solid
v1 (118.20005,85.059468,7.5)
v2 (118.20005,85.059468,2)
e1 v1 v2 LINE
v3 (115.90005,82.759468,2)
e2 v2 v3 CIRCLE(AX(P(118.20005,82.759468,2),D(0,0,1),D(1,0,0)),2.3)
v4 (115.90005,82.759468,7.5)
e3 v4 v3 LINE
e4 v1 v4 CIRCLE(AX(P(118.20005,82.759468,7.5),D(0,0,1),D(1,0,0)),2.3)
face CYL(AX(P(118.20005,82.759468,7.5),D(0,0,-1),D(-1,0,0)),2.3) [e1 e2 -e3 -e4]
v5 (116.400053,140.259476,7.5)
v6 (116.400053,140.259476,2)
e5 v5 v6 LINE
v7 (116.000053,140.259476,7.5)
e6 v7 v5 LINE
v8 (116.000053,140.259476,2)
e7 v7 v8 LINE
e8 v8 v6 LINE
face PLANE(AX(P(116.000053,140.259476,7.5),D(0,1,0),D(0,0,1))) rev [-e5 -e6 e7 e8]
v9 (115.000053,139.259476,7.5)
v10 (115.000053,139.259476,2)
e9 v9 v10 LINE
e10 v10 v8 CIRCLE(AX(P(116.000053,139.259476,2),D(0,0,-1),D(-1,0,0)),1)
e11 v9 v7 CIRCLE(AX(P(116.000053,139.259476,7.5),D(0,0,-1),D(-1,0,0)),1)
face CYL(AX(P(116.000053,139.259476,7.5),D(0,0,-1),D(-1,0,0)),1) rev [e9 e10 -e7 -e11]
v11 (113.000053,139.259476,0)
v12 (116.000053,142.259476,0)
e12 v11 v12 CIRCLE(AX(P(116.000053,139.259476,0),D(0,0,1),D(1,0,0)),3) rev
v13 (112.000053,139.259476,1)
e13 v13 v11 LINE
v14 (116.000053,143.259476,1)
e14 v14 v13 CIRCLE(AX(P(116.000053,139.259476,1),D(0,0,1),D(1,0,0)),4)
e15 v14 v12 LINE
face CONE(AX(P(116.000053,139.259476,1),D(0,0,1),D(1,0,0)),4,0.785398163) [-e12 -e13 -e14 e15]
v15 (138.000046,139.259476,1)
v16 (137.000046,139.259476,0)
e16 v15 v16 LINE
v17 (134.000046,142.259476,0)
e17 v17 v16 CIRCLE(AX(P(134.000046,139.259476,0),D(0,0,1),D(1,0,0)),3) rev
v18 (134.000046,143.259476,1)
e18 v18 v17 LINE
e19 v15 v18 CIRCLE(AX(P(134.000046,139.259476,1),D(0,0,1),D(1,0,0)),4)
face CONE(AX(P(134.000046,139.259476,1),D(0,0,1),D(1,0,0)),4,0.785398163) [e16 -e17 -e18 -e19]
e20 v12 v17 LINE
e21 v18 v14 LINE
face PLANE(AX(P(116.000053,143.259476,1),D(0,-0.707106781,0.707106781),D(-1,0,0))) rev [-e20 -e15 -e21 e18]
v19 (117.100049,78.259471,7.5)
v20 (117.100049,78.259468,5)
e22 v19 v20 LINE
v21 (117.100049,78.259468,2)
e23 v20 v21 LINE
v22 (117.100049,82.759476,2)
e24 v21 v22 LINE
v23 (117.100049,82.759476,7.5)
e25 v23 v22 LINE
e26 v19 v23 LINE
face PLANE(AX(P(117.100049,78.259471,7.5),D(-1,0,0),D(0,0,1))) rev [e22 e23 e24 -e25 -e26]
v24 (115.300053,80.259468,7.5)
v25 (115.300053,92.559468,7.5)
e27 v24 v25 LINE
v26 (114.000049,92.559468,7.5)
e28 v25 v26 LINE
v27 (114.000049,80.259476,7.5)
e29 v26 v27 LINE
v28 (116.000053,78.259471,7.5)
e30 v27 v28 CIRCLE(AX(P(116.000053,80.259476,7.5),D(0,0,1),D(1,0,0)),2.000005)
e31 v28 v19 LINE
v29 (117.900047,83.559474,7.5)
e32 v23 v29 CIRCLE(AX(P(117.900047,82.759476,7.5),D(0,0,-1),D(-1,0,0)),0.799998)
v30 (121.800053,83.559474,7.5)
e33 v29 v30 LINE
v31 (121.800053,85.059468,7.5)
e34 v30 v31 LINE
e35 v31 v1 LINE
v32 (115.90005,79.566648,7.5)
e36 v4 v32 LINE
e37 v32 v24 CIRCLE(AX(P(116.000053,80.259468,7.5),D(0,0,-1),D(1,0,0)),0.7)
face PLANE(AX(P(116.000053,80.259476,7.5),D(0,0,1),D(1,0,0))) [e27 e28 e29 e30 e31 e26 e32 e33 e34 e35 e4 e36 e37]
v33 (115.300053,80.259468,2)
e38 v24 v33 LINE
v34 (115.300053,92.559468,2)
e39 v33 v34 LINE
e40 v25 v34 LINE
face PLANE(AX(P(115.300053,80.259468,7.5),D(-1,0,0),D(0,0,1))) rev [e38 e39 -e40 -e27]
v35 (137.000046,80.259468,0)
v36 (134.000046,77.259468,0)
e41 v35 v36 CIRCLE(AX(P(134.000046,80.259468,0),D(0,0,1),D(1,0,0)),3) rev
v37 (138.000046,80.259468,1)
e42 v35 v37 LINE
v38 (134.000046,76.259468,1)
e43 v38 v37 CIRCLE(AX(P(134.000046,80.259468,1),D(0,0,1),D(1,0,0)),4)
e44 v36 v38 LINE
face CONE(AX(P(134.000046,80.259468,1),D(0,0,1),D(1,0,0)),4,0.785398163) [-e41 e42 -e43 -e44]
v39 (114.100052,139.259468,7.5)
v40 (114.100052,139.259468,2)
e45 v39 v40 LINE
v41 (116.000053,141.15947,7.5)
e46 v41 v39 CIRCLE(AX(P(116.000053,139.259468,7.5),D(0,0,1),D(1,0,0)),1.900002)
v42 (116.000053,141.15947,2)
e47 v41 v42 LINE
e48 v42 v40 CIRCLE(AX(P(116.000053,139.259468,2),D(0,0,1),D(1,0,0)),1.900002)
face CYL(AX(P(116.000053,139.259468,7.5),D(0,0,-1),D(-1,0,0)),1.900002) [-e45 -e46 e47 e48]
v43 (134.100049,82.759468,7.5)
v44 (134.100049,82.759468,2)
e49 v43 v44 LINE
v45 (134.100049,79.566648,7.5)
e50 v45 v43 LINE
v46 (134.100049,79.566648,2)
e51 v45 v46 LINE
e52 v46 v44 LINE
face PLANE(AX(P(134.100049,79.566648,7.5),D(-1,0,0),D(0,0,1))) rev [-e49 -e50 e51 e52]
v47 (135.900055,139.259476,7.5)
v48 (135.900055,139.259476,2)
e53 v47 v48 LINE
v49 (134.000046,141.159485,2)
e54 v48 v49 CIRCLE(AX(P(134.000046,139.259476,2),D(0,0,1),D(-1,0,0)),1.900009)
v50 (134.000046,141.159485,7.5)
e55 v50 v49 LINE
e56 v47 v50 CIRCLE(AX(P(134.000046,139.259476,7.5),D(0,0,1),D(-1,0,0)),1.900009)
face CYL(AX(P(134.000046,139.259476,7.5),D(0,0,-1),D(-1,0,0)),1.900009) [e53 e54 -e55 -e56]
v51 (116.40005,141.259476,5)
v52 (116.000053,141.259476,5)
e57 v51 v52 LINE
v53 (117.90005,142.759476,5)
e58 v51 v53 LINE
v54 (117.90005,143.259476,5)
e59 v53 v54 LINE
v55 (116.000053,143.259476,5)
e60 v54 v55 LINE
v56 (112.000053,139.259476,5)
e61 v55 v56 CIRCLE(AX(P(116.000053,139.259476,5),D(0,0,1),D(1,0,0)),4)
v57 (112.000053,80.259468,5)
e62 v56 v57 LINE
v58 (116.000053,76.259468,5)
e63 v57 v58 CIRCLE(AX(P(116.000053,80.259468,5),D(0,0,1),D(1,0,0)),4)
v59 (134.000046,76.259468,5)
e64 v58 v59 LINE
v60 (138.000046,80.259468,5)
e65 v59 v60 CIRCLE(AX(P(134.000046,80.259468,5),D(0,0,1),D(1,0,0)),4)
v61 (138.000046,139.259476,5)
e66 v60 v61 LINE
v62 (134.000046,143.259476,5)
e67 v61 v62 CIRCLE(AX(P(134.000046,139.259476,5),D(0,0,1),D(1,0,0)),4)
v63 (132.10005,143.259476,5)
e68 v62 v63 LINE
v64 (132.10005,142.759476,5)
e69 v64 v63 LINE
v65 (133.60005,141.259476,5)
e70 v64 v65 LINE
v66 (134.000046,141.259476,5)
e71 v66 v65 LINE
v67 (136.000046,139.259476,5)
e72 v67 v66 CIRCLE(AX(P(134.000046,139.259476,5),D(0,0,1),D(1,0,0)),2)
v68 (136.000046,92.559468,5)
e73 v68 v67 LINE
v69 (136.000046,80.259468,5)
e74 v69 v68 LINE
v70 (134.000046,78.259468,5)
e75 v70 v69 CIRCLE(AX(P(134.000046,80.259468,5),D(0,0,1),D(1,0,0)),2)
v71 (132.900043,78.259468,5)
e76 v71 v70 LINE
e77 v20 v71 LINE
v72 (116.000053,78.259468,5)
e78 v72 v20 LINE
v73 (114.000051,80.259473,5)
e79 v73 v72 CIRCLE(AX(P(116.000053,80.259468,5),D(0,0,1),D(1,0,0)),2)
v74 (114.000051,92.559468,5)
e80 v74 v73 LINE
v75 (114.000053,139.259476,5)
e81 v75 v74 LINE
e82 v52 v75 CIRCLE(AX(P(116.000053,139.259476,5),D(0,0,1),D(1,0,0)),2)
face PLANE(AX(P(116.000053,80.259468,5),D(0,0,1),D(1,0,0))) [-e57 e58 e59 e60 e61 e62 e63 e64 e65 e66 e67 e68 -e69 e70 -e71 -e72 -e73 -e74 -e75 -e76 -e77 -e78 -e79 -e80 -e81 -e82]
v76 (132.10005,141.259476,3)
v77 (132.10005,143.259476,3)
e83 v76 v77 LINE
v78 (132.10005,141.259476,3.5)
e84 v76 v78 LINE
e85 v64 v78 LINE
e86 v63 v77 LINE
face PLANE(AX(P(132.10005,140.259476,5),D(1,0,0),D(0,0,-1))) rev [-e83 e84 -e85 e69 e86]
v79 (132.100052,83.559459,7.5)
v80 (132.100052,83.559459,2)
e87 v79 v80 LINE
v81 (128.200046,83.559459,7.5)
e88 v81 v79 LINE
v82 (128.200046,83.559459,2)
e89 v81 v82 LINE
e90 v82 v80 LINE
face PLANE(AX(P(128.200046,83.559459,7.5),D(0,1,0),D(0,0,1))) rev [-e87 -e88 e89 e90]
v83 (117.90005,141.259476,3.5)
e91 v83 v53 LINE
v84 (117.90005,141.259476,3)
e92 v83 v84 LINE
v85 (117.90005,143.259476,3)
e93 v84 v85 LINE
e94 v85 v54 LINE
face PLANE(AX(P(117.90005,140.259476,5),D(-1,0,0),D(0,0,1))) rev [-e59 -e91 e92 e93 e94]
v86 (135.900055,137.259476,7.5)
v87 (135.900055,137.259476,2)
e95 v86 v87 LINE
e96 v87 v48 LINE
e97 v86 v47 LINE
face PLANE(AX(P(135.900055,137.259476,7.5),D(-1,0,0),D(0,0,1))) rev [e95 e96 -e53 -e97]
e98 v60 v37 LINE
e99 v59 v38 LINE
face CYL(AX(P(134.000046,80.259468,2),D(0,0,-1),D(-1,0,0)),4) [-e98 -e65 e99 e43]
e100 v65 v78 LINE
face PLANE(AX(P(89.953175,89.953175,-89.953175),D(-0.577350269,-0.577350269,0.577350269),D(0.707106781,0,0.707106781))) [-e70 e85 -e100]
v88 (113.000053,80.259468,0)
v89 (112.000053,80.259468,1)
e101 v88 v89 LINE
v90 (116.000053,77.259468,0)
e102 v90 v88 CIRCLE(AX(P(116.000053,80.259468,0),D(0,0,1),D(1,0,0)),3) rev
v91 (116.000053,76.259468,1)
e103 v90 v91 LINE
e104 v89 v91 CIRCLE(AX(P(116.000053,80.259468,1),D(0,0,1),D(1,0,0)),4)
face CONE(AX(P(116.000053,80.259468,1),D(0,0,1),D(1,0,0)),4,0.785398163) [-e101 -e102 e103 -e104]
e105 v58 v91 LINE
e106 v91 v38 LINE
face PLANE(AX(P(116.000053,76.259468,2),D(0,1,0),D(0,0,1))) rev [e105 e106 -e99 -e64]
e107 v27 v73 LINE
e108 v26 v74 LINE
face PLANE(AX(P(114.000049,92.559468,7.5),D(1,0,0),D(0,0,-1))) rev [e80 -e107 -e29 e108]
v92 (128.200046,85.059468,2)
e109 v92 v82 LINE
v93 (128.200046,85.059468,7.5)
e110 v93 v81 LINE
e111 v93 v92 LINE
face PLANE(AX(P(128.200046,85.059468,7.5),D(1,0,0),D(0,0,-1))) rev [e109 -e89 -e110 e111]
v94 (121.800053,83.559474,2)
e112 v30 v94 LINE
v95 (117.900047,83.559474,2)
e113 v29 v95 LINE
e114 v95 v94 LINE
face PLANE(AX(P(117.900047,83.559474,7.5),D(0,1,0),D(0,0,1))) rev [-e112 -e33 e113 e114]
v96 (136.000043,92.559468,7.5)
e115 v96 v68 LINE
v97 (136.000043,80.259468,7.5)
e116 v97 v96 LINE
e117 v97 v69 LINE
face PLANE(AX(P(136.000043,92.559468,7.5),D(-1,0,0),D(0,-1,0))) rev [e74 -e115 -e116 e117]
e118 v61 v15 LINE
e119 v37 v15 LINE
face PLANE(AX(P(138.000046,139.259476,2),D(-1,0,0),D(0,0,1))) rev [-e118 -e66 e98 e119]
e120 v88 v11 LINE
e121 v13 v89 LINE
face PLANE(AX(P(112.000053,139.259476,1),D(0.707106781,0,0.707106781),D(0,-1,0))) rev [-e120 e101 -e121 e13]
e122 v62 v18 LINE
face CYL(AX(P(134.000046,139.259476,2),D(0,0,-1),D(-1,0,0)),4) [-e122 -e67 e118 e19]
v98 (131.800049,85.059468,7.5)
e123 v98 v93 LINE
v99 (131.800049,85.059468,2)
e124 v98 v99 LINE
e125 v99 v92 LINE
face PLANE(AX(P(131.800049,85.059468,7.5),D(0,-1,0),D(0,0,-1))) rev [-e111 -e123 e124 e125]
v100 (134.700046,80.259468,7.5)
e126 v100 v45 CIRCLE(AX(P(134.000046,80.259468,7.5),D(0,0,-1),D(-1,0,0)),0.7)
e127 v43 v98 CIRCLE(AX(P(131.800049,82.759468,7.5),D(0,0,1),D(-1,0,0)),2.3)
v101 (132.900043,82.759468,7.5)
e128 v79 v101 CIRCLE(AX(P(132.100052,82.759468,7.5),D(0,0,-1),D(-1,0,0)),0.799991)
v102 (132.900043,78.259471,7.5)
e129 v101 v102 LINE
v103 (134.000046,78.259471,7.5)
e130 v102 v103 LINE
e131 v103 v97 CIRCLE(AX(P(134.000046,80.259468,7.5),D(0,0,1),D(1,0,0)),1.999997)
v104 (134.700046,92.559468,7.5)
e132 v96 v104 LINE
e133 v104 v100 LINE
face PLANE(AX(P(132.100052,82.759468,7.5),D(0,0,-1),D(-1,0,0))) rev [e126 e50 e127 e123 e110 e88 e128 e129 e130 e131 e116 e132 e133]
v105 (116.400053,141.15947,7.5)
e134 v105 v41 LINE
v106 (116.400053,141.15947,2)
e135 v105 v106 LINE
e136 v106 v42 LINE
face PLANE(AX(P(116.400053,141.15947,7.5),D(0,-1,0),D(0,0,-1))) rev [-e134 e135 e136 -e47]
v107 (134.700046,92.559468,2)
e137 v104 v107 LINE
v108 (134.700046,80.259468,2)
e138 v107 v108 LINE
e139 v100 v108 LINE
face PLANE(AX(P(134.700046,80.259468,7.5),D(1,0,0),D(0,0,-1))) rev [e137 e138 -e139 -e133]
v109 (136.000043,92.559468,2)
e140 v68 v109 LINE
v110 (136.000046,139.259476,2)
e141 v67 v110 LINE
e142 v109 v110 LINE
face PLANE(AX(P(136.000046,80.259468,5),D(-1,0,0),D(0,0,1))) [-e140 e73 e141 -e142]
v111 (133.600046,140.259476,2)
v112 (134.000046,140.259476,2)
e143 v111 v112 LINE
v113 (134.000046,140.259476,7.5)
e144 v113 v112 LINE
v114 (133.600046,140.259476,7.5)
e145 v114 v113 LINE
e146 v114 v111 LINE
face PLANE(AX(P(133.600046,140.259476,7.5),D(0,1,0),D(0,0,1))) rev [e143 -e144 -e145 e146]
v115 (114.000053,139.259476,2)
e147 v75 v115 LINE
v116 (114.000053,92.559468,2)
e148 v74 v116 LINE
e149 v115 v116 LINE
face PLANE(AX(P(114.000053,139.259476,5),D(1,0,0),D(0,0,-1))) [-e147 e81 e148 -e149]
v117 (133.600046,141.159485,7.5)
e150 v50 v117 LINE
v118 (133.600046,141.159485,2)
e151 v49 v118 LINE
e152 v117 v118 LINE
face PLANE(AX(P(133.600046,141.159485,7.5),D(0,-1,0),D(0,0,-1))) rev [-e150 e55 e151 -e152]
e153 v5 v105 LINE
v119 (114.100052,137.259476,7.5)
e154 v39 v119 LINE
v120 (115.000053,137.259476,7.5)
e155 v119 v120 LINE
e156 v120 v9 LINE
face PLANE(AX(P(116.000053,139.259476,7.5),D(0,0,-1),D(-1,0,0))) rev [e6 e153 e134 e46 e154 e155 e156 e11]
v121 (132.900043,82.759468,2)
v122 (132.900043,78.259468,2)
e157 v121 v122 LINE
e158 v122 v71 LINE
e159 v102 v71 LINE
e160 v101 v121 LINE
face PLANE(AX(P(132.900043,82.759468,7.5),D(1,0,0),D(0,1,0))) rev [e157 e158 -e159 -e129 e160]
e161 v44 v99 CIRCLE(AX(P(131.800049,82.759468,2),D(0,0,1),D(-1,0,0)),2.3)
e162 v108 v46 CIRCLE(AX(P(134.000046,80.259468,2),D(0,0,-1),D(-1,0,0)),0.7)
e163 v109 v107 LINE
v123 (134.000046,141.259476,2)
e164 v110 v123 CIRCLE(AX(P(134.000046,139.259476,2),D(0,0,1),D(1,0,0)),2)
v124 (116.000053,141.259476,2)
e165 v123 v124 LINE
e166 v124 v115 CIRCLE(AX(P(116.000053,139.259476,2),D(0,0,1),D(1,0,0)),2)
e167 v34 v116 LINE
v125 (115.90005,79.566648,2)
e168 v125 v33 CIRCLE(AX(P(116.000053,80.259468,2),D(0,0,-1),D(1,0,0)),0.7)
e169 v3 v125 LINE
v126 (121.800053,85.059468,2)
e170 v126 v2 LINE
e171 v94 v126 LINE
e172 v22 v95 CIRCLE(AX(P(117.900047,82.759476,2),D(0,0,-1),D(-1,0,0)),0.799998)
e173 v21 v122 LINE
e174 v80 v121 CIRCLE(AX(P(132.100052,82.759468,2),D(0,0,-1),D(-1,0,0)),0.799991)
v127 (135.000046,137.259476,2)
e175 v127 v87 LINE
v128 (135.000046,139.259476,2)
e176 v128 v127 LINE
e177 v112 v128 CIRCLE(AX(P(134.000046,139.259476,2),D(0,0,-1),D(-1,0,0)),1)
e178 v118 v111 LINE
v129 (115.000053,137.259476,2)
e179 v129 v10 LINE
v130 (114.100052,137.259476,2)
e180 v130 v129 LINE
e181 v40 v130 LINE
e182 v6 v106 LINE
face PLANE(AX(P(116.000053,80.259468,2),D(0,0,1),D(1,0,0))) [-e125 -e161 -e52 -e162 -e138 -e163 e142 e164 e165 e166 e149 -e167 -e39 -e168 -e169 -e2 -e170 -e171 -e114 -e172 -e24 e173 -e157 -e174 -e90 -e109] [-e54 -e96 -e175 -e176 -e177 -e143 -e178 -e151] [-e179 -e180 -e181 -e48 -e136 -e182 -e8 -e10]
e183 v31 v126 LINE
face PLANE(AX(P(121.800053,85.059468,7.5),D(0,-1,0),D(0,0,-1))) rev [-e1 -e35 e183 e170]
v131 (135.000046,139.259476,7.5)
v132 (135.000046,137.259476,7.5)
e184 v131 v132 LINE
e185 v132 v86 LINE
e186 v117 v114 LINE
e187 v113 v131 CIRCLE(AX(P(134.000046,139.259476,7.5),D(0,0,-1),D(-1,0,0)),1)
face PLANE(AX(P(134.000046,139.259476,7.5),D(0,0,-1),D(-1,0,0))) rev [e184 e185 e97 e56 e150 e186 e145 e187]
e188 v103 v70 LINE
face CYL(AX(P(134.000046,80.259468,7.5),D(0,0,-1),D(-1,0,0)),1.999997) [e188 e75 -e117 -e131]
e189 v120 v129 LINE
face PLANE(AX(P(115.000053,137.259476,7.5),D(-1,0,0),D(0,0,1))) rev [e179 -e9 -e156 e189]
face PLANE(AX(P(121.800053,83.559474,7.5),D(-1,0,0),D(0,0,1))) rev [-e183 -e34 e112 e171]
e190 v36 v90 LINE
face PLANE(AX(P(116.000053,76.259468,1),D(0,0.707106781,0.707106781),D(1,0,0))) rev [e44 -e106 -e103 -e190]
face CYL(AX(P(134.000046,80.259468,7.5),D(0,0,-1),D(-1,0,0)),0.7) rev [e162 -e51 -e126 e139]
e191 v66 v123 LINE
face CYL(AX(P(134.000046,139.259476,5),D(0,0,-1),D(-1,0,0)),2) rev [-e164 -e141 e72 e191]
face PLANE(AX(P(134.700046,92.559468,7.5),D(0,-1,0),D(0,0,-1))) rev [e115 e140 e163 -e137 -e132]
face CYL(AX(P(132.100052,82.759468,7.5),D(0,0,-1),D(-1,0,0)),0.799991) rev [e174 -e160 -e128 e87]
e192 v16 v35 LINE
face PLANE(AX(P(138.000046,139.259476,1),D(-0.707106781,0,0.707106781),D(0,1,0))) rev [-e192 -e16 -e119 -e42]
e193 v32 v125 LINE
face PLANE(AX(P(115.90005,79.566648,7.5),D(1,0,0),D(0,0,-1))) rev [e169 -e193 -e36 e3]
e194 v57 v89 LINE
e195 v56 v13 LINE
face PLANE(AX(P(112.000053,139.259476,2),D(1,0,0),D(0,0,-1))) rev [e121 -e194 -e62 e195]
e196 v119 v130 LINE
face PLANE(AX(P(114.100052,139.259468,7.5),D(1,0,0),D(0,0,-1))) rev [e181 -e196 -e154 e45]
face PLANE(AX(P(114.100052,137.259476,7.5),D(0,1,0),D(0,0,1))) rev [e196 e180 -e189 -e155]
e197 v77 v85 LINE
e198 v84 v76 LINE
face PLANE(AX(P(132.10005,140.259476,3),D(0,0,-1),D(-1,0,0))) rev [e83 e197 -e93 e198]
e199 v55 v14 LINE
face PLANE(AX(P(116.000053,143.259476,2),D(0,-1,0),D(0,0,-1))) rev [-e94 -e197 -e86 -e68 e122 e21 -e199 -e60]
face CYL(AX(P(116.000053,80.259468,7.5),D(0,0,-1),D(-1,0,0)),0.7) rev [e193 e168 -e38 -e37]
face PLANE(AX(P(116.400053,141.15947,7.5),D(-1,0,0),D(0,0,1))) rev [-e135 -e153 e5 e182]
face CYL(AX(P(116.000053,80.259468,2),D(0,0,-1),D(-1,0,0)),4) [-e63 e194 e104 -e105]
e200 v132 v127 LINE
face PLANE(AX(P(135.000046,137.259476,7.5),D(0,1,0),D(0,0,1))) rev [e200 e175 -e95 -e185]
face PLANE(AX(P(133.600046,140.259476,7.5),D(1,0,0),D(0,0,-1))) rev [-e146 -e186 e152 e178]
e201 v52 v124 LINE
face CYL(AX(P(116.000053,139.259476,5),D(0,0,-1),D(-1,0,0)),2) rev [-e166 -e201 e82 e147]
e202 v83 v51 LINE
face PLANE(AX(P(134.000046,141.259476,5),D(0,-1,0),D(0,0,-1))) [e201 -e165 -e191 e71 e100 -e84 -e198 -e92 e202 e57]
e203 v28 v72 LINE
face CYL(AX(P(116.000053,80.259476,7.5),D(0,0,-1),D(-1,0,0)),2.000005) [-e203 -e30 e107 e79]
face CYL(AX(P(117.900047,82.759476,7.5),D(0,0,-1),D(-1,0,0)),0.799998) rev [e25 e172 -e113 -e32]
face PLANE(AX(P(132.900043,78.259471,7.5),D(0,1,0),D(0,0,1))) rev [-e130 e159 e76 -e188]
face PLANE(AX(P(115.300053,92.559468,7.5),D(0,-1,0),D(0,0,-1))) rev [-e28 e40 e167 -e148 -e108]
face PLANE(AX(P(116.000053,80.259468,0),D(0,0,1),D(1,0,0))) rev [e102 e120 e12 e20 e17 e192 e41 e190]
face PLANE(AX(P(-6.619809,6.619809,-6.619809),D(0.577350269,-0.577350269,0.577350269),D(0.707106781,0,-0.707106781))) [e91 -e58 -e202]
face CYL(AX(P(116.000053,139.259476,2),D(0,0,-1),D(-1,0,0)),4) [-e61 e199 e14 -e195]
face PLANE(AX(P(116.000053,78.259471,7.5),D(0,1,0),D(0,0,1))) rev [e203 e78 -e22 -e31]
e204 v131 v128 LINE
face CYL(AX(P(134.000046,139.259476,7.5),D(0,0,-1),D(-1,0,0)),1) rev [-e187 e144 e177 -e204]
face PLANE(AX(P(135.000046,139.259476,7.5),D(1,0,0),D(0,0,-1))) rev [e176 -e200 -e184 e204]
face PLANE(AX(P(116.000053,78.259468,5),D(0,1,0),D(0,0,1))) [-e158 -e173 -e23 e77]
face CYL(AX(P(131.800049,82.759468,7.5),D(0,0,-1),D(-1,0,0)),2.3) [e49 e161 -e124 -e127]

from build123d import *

# Parameters (mm, degrees)
BOSS_EXTRUDE1_DEPTH = 2
BOSS_EXTRUDE2_DEPTH = 5.5
BOSS_EXTRUDE3_DEPTH = 3
SKETCH5_W           = 14.2
SKETCH5_H           = 2
CUT_EXTRUDE1_DEPTH  = 3
CHAMFER1_SIZE       = 1
CHAMFER2_START      = 154
CHAMFER2_DEPTH      = 1.803469575
CHAMFER3_START      = -11.465845015
CHAMFER3_DEPTH      = 10.161362536


with BuildPart() as part:
    # Sketch1 → Boss-Extrude1 (new body)
    with BuildSketch(Plane.XY):
        with BuildLine():
            Line((116.000053406, 143.259475708), (134.000045776, 143.259475708))
            ThreePointArc((134.000045776, 143.259475708), (136.828472901, 142.087902833), (138.000045776, 139.259475708))
            Line((138.000045776, 139.259475708), (138.000045776, 80.259468079))
            ThreePointArc((138.000045776, 80.259468079), (136.828472901, 77.431040954), (134.000045776, 76.259468079))
            Line((134.000045776, 76.259468079), (116.000053406, 76.259468079))
            ThreePointArc((116.000053406, 76.259468079), (113.171626281, 77.431040954), (112.000053406, 80.259468079))
            Line((112.000053406, 80.259468079), (112.000053406, 139.259475708))
            ThreePointArc((112.000053406, 139.259475708), (113.171626281, 142.087902833), (116.000053406, 143.259475708))
        make_face()
    extrude(amount=BOSS_EXTRUDE1_DEPTH)

    # Sketch2 → Boss-Extrude2 (add)
    with BuildSketch(Plane.XY.offset(2)):
        with BuildLine():
            Line((133.600045776, 140.259475708), (134.000045776, 140.259475708))
            ThreePointArc((134.000045776, 140.259475708), (134.707152558, 139.966582489), (135.000045776, 139.259475708))
            Line((135.000045776, 139.259475708), (135.000045776, 137.259475708))
            Line((135.000045776, 137.259475708), (135.900054932, 137.259475708))
            Line((135.900054932, 137.259475708), (135.900054932, 139.259475708))
            ThreePointArc((135.900054932, 139.259475708), (135.343555134, 140.602985066), (134.000045776, 141.159484863))
            Line((134.000045776, 141.159484863), (133.600045776, 141.159484863))
            Line((133.600045776, 141.159484863), (133.600045776, 140.259475708))
        make_face()
        with BuildLine():
            Line((114.10005188, 137.259475708), (115.000053406, 137.259475708))
            Line((115.000053406, 137.259475708), (115.000053406, 139.259475708))
            ThreePointArc((115.000053406, 139.259475708), (115.292946625, 139.966582489), (116.000053406, 140.259475708))
            Line((116.000053406, 140.259475708), (116.400053406, 140.259475708))
            Line((116.400053406, 140.259475708), (116.400053406, 141.159469604))
            Line((116.400053406, 141.159469604), (116.000053406, 141.159469604))
            ThreePointArc((116.000053406, 141.159469604), (114.656549443, 140.602972042), (114.10005188, 139.259468079))
            Line((114.10005188, 139.259468079), (114.10005188, 137.259475708))
        make_face()
        with BuildLine():
            Line((115.300053406, 92.559468079), (114.000048828, 92.559468079))
            Line((114.000048828, 92.559468079), (114.000048828, 80.259475708))
            ThreePointArc((114.000048828, 80.259475708), (114.585836607, 78.845258909), (116.000053406, 78.25947113))
            Line((116.000053406, 78.25947113), (117.100048828, 78.25947113))
            Line((117.100048828, 78.25947113), (117.100048828, 82.759475708))
            ThreePointArc((117.100048828, 82.759475708), (117.334362956, 83.325160054), (117.900047302, 83.559474182))
            Line((117.900047302, 83.559474182), (121.800053406, 83.559474182))
            Line((121.800053406, 83.559474182), (121.800053406, 85.059468079))
            Line((121.800053406, 85.059468079), (118.200050354, 85.059468079))
            ThreePointArc((118.200050354, 85.059468079), (116.573704757, 84.385813675), (115.900050354, 82.759468079))
            Line((115.900050354, 82.759468079), (115.900050354, 79.566648196))
            ThreePointArc((115.900050354, 79.566648196), (115.470902134, 79.801211675), (115.300053406, 80.259468079))
            Line((115.300053406, 80.259468079), (115.300053406, 92.559468079))
        make_face()
        with BuildLine():
            Line((128.200045776, 85.059468079), (128.200045776, 83.559458923))
            Line((128.200045776, 83.559458923), (132.10005188, 83.559458923))
            ThreePointArc((132.10005188, 83.559458923), (132.665730831, 83.32514703), (132.900042725, 82.759468079))
            Line((132.900042725, 82.759468079), (132.900042725, 78.25947113))
            Line((132.900042725, 78.25947113), (134.000045776, 78.25947113))
            ThreePointArc((134.000045776, 78.25947113), (135.414257181, 78.845256674), (136.000042725, 80.259468079))
            Line((136.000042725, 80.259468079), (136.000042725, 92.559468079))
            Line((136.000042725, 92.559468079), (134.700045776, 92.559468079))
            Line((134.700045776, 92.559468079), (134.700045776, 80.259468079))
            ThreePointArc((134.700045776, 80.259468079), (134.529197048, 79.801211675), (134.100048828, 79.566648196))
            Line((134.100048828, 79.566648196), (134.100048828, 82.759468079))
            ThreePointArc((134.100048828, 82.759468079), (133.426394425, 84.385813675), (131.800048828, 85.059468079))
            Line((131.800048828, 85.059468079), (128.200045776, 85.059468079))
        make_face()
    extrude(amount=BOSS_EXTRUDE2_DEPTH)


with BuildPart() as boss_extrude3_tool:
    # Sketch3 → Boss-Extrude3 (new body)
    with BuildSketch(Plane.XY.offset(2)):
        with BuildLine():
            Line((116.000053406, 76.259468079), (134.000045776, 76.259468079))
            ThreePointArc((134.000045776, 76.259468079), (136.828472901, 77.431040954), (138.000045776, 80.259468079))
            Line((138.000045776, 80.259468079), (138.000045776, 139.259475708))
            ThreePointArc((138.000045776, 139.259475708), (136.828472901, 142.087902833), (134.000045776, 143.259475708))
            Line((134.000045776, 143.259475708), (116.000053406, 143.259475708))
            ThreePointArc((116.000053406, 143.259475708), (113.171626281, 142.087902833), (112.000053406, 139.259475708))
            Line((112.000053406, 139.259475708), (112.000053406, 80.259468079))
            ThreePointArc((112.000053406, 80.259468079), (113.171626281, 77.431040954), (116.000053406, 76.259468079))
        make_face()
        with BuildLine():
            Line((116.000053406, 78.259468079), (134.000045776, 78.259468079))
            ThreePointArc((134.000045776, 78.259468079), (135.414259339, 78.845254516), (136.000045776, 80.259468079))
            Line((136.000045776, 80.259468079), (136.000045776, 139.259475708))
            ThreePointArc((136.000045776, 139.259475708), (135.414259339, 140.67368927), (134.000045776, 141.259475708))
            Line((134.000045776, 141.259475708), (116.000053406, 141.259475708))
            ThreePointArc((116.000053406, 141.259475708), (114.585839843, 140.67368927), (114.000053406, 139.259475708))
            Line((114.000053406, 139.259475708), (114.000053406, 80.259468079))
            ThreePointArc((114.000053406, 80.259468079), (114.585839843, 78.845254516), (116.000053406, 78.259468079))
        make_face(mode=Mode.SUBTRACT)
    extrude(amount=BOSS_EXTRUDE3_DEPTH)


with BuildPart() as part_1:
    add(part.part)


with BuildPart() as part_2:
    # Boss-Extrude3: joined with boss_extrude3_tool
    add(part_1.part.fuse(boss_extrude3_tool.part, tol=0.00001))

    # Sketch5 → Cut-Extrude1 (cut)
    with BuildSketch(Plane(origin=(0, 143.259475708, 0), x_dir=(1, 0, 0), z_dir=(0, 1, 0))):
        with Locations((125.000049591, -4)):
            Rectangle(SKETCH5_W, SKETCH5_H)
    extrude(amount=-CUT_EXTRUDE1_DEPTH, mode=Mode.SUBTRACT)

    # Chamfer1
    chamfer1_edges = [part_2.edges().sort_by_distance(p)[0] for p in [
        (138.000045776, 109.759471893, 0),
        (136.828472901, 77.431040954, 0),
        (125.000049591, 76.259468079, 0),
        (113.171626281, 77.431040954, 0),
        (112.000053406, 109.759471893, 0),
        (113.171626281, 142.087902833, 0),
        (125.000049591, 143.259475708, 0),
        (136.828472901, 142.087902833, 0),
    ]]
    chamfer(chamfer1_edges, length=CHAMFER1_SIZE)

    # Chamfer2: read off the stored shape, not the designer's step
    # Chamfer2 outline → Chamfer2 (cut)
    with BuildSketch(Plane(origin=(0, 0, 0), x_dir=(0.8164965809277274, -0.4082482904638596, 0.4082482904638638), z_dir=(0.5773502691896238, 0.5773502691896238, -0.5773502691896297)).offset(CHAMFER2_START)):
        Polygon((51.619168378, -104.481727258), (53.456285686, -103.421067086), (51.619168378, -102.360406914), align=None)
    extrude(amount=CHAMFER2_DEPTH, mode=Mode.SUBTRACT)

    # Chamfer3: read off the stored shape, not the designer's step
    # Chamfer3 outline → Chamfer3 (cut)
    with BuildSketch(Plane(origin=(0, 0, 0), x_dir=(0.8164965809277249, 0.4082482904638619, -0.4082482904638661), z_dir=(0.5773502691896272, -0.5773502691896221, 0.5773502691896281)).offset(CHAMFER3_START)):
        Polygon((152.505057835, 104.481727258), (150.667940528, 103.421067086), (152.505057835, 102.360406914), align=None)
    extrude(amount=CHAMFER3_DEPTH, mode=Mode.SUBTRACT)


solid = part_2.part
